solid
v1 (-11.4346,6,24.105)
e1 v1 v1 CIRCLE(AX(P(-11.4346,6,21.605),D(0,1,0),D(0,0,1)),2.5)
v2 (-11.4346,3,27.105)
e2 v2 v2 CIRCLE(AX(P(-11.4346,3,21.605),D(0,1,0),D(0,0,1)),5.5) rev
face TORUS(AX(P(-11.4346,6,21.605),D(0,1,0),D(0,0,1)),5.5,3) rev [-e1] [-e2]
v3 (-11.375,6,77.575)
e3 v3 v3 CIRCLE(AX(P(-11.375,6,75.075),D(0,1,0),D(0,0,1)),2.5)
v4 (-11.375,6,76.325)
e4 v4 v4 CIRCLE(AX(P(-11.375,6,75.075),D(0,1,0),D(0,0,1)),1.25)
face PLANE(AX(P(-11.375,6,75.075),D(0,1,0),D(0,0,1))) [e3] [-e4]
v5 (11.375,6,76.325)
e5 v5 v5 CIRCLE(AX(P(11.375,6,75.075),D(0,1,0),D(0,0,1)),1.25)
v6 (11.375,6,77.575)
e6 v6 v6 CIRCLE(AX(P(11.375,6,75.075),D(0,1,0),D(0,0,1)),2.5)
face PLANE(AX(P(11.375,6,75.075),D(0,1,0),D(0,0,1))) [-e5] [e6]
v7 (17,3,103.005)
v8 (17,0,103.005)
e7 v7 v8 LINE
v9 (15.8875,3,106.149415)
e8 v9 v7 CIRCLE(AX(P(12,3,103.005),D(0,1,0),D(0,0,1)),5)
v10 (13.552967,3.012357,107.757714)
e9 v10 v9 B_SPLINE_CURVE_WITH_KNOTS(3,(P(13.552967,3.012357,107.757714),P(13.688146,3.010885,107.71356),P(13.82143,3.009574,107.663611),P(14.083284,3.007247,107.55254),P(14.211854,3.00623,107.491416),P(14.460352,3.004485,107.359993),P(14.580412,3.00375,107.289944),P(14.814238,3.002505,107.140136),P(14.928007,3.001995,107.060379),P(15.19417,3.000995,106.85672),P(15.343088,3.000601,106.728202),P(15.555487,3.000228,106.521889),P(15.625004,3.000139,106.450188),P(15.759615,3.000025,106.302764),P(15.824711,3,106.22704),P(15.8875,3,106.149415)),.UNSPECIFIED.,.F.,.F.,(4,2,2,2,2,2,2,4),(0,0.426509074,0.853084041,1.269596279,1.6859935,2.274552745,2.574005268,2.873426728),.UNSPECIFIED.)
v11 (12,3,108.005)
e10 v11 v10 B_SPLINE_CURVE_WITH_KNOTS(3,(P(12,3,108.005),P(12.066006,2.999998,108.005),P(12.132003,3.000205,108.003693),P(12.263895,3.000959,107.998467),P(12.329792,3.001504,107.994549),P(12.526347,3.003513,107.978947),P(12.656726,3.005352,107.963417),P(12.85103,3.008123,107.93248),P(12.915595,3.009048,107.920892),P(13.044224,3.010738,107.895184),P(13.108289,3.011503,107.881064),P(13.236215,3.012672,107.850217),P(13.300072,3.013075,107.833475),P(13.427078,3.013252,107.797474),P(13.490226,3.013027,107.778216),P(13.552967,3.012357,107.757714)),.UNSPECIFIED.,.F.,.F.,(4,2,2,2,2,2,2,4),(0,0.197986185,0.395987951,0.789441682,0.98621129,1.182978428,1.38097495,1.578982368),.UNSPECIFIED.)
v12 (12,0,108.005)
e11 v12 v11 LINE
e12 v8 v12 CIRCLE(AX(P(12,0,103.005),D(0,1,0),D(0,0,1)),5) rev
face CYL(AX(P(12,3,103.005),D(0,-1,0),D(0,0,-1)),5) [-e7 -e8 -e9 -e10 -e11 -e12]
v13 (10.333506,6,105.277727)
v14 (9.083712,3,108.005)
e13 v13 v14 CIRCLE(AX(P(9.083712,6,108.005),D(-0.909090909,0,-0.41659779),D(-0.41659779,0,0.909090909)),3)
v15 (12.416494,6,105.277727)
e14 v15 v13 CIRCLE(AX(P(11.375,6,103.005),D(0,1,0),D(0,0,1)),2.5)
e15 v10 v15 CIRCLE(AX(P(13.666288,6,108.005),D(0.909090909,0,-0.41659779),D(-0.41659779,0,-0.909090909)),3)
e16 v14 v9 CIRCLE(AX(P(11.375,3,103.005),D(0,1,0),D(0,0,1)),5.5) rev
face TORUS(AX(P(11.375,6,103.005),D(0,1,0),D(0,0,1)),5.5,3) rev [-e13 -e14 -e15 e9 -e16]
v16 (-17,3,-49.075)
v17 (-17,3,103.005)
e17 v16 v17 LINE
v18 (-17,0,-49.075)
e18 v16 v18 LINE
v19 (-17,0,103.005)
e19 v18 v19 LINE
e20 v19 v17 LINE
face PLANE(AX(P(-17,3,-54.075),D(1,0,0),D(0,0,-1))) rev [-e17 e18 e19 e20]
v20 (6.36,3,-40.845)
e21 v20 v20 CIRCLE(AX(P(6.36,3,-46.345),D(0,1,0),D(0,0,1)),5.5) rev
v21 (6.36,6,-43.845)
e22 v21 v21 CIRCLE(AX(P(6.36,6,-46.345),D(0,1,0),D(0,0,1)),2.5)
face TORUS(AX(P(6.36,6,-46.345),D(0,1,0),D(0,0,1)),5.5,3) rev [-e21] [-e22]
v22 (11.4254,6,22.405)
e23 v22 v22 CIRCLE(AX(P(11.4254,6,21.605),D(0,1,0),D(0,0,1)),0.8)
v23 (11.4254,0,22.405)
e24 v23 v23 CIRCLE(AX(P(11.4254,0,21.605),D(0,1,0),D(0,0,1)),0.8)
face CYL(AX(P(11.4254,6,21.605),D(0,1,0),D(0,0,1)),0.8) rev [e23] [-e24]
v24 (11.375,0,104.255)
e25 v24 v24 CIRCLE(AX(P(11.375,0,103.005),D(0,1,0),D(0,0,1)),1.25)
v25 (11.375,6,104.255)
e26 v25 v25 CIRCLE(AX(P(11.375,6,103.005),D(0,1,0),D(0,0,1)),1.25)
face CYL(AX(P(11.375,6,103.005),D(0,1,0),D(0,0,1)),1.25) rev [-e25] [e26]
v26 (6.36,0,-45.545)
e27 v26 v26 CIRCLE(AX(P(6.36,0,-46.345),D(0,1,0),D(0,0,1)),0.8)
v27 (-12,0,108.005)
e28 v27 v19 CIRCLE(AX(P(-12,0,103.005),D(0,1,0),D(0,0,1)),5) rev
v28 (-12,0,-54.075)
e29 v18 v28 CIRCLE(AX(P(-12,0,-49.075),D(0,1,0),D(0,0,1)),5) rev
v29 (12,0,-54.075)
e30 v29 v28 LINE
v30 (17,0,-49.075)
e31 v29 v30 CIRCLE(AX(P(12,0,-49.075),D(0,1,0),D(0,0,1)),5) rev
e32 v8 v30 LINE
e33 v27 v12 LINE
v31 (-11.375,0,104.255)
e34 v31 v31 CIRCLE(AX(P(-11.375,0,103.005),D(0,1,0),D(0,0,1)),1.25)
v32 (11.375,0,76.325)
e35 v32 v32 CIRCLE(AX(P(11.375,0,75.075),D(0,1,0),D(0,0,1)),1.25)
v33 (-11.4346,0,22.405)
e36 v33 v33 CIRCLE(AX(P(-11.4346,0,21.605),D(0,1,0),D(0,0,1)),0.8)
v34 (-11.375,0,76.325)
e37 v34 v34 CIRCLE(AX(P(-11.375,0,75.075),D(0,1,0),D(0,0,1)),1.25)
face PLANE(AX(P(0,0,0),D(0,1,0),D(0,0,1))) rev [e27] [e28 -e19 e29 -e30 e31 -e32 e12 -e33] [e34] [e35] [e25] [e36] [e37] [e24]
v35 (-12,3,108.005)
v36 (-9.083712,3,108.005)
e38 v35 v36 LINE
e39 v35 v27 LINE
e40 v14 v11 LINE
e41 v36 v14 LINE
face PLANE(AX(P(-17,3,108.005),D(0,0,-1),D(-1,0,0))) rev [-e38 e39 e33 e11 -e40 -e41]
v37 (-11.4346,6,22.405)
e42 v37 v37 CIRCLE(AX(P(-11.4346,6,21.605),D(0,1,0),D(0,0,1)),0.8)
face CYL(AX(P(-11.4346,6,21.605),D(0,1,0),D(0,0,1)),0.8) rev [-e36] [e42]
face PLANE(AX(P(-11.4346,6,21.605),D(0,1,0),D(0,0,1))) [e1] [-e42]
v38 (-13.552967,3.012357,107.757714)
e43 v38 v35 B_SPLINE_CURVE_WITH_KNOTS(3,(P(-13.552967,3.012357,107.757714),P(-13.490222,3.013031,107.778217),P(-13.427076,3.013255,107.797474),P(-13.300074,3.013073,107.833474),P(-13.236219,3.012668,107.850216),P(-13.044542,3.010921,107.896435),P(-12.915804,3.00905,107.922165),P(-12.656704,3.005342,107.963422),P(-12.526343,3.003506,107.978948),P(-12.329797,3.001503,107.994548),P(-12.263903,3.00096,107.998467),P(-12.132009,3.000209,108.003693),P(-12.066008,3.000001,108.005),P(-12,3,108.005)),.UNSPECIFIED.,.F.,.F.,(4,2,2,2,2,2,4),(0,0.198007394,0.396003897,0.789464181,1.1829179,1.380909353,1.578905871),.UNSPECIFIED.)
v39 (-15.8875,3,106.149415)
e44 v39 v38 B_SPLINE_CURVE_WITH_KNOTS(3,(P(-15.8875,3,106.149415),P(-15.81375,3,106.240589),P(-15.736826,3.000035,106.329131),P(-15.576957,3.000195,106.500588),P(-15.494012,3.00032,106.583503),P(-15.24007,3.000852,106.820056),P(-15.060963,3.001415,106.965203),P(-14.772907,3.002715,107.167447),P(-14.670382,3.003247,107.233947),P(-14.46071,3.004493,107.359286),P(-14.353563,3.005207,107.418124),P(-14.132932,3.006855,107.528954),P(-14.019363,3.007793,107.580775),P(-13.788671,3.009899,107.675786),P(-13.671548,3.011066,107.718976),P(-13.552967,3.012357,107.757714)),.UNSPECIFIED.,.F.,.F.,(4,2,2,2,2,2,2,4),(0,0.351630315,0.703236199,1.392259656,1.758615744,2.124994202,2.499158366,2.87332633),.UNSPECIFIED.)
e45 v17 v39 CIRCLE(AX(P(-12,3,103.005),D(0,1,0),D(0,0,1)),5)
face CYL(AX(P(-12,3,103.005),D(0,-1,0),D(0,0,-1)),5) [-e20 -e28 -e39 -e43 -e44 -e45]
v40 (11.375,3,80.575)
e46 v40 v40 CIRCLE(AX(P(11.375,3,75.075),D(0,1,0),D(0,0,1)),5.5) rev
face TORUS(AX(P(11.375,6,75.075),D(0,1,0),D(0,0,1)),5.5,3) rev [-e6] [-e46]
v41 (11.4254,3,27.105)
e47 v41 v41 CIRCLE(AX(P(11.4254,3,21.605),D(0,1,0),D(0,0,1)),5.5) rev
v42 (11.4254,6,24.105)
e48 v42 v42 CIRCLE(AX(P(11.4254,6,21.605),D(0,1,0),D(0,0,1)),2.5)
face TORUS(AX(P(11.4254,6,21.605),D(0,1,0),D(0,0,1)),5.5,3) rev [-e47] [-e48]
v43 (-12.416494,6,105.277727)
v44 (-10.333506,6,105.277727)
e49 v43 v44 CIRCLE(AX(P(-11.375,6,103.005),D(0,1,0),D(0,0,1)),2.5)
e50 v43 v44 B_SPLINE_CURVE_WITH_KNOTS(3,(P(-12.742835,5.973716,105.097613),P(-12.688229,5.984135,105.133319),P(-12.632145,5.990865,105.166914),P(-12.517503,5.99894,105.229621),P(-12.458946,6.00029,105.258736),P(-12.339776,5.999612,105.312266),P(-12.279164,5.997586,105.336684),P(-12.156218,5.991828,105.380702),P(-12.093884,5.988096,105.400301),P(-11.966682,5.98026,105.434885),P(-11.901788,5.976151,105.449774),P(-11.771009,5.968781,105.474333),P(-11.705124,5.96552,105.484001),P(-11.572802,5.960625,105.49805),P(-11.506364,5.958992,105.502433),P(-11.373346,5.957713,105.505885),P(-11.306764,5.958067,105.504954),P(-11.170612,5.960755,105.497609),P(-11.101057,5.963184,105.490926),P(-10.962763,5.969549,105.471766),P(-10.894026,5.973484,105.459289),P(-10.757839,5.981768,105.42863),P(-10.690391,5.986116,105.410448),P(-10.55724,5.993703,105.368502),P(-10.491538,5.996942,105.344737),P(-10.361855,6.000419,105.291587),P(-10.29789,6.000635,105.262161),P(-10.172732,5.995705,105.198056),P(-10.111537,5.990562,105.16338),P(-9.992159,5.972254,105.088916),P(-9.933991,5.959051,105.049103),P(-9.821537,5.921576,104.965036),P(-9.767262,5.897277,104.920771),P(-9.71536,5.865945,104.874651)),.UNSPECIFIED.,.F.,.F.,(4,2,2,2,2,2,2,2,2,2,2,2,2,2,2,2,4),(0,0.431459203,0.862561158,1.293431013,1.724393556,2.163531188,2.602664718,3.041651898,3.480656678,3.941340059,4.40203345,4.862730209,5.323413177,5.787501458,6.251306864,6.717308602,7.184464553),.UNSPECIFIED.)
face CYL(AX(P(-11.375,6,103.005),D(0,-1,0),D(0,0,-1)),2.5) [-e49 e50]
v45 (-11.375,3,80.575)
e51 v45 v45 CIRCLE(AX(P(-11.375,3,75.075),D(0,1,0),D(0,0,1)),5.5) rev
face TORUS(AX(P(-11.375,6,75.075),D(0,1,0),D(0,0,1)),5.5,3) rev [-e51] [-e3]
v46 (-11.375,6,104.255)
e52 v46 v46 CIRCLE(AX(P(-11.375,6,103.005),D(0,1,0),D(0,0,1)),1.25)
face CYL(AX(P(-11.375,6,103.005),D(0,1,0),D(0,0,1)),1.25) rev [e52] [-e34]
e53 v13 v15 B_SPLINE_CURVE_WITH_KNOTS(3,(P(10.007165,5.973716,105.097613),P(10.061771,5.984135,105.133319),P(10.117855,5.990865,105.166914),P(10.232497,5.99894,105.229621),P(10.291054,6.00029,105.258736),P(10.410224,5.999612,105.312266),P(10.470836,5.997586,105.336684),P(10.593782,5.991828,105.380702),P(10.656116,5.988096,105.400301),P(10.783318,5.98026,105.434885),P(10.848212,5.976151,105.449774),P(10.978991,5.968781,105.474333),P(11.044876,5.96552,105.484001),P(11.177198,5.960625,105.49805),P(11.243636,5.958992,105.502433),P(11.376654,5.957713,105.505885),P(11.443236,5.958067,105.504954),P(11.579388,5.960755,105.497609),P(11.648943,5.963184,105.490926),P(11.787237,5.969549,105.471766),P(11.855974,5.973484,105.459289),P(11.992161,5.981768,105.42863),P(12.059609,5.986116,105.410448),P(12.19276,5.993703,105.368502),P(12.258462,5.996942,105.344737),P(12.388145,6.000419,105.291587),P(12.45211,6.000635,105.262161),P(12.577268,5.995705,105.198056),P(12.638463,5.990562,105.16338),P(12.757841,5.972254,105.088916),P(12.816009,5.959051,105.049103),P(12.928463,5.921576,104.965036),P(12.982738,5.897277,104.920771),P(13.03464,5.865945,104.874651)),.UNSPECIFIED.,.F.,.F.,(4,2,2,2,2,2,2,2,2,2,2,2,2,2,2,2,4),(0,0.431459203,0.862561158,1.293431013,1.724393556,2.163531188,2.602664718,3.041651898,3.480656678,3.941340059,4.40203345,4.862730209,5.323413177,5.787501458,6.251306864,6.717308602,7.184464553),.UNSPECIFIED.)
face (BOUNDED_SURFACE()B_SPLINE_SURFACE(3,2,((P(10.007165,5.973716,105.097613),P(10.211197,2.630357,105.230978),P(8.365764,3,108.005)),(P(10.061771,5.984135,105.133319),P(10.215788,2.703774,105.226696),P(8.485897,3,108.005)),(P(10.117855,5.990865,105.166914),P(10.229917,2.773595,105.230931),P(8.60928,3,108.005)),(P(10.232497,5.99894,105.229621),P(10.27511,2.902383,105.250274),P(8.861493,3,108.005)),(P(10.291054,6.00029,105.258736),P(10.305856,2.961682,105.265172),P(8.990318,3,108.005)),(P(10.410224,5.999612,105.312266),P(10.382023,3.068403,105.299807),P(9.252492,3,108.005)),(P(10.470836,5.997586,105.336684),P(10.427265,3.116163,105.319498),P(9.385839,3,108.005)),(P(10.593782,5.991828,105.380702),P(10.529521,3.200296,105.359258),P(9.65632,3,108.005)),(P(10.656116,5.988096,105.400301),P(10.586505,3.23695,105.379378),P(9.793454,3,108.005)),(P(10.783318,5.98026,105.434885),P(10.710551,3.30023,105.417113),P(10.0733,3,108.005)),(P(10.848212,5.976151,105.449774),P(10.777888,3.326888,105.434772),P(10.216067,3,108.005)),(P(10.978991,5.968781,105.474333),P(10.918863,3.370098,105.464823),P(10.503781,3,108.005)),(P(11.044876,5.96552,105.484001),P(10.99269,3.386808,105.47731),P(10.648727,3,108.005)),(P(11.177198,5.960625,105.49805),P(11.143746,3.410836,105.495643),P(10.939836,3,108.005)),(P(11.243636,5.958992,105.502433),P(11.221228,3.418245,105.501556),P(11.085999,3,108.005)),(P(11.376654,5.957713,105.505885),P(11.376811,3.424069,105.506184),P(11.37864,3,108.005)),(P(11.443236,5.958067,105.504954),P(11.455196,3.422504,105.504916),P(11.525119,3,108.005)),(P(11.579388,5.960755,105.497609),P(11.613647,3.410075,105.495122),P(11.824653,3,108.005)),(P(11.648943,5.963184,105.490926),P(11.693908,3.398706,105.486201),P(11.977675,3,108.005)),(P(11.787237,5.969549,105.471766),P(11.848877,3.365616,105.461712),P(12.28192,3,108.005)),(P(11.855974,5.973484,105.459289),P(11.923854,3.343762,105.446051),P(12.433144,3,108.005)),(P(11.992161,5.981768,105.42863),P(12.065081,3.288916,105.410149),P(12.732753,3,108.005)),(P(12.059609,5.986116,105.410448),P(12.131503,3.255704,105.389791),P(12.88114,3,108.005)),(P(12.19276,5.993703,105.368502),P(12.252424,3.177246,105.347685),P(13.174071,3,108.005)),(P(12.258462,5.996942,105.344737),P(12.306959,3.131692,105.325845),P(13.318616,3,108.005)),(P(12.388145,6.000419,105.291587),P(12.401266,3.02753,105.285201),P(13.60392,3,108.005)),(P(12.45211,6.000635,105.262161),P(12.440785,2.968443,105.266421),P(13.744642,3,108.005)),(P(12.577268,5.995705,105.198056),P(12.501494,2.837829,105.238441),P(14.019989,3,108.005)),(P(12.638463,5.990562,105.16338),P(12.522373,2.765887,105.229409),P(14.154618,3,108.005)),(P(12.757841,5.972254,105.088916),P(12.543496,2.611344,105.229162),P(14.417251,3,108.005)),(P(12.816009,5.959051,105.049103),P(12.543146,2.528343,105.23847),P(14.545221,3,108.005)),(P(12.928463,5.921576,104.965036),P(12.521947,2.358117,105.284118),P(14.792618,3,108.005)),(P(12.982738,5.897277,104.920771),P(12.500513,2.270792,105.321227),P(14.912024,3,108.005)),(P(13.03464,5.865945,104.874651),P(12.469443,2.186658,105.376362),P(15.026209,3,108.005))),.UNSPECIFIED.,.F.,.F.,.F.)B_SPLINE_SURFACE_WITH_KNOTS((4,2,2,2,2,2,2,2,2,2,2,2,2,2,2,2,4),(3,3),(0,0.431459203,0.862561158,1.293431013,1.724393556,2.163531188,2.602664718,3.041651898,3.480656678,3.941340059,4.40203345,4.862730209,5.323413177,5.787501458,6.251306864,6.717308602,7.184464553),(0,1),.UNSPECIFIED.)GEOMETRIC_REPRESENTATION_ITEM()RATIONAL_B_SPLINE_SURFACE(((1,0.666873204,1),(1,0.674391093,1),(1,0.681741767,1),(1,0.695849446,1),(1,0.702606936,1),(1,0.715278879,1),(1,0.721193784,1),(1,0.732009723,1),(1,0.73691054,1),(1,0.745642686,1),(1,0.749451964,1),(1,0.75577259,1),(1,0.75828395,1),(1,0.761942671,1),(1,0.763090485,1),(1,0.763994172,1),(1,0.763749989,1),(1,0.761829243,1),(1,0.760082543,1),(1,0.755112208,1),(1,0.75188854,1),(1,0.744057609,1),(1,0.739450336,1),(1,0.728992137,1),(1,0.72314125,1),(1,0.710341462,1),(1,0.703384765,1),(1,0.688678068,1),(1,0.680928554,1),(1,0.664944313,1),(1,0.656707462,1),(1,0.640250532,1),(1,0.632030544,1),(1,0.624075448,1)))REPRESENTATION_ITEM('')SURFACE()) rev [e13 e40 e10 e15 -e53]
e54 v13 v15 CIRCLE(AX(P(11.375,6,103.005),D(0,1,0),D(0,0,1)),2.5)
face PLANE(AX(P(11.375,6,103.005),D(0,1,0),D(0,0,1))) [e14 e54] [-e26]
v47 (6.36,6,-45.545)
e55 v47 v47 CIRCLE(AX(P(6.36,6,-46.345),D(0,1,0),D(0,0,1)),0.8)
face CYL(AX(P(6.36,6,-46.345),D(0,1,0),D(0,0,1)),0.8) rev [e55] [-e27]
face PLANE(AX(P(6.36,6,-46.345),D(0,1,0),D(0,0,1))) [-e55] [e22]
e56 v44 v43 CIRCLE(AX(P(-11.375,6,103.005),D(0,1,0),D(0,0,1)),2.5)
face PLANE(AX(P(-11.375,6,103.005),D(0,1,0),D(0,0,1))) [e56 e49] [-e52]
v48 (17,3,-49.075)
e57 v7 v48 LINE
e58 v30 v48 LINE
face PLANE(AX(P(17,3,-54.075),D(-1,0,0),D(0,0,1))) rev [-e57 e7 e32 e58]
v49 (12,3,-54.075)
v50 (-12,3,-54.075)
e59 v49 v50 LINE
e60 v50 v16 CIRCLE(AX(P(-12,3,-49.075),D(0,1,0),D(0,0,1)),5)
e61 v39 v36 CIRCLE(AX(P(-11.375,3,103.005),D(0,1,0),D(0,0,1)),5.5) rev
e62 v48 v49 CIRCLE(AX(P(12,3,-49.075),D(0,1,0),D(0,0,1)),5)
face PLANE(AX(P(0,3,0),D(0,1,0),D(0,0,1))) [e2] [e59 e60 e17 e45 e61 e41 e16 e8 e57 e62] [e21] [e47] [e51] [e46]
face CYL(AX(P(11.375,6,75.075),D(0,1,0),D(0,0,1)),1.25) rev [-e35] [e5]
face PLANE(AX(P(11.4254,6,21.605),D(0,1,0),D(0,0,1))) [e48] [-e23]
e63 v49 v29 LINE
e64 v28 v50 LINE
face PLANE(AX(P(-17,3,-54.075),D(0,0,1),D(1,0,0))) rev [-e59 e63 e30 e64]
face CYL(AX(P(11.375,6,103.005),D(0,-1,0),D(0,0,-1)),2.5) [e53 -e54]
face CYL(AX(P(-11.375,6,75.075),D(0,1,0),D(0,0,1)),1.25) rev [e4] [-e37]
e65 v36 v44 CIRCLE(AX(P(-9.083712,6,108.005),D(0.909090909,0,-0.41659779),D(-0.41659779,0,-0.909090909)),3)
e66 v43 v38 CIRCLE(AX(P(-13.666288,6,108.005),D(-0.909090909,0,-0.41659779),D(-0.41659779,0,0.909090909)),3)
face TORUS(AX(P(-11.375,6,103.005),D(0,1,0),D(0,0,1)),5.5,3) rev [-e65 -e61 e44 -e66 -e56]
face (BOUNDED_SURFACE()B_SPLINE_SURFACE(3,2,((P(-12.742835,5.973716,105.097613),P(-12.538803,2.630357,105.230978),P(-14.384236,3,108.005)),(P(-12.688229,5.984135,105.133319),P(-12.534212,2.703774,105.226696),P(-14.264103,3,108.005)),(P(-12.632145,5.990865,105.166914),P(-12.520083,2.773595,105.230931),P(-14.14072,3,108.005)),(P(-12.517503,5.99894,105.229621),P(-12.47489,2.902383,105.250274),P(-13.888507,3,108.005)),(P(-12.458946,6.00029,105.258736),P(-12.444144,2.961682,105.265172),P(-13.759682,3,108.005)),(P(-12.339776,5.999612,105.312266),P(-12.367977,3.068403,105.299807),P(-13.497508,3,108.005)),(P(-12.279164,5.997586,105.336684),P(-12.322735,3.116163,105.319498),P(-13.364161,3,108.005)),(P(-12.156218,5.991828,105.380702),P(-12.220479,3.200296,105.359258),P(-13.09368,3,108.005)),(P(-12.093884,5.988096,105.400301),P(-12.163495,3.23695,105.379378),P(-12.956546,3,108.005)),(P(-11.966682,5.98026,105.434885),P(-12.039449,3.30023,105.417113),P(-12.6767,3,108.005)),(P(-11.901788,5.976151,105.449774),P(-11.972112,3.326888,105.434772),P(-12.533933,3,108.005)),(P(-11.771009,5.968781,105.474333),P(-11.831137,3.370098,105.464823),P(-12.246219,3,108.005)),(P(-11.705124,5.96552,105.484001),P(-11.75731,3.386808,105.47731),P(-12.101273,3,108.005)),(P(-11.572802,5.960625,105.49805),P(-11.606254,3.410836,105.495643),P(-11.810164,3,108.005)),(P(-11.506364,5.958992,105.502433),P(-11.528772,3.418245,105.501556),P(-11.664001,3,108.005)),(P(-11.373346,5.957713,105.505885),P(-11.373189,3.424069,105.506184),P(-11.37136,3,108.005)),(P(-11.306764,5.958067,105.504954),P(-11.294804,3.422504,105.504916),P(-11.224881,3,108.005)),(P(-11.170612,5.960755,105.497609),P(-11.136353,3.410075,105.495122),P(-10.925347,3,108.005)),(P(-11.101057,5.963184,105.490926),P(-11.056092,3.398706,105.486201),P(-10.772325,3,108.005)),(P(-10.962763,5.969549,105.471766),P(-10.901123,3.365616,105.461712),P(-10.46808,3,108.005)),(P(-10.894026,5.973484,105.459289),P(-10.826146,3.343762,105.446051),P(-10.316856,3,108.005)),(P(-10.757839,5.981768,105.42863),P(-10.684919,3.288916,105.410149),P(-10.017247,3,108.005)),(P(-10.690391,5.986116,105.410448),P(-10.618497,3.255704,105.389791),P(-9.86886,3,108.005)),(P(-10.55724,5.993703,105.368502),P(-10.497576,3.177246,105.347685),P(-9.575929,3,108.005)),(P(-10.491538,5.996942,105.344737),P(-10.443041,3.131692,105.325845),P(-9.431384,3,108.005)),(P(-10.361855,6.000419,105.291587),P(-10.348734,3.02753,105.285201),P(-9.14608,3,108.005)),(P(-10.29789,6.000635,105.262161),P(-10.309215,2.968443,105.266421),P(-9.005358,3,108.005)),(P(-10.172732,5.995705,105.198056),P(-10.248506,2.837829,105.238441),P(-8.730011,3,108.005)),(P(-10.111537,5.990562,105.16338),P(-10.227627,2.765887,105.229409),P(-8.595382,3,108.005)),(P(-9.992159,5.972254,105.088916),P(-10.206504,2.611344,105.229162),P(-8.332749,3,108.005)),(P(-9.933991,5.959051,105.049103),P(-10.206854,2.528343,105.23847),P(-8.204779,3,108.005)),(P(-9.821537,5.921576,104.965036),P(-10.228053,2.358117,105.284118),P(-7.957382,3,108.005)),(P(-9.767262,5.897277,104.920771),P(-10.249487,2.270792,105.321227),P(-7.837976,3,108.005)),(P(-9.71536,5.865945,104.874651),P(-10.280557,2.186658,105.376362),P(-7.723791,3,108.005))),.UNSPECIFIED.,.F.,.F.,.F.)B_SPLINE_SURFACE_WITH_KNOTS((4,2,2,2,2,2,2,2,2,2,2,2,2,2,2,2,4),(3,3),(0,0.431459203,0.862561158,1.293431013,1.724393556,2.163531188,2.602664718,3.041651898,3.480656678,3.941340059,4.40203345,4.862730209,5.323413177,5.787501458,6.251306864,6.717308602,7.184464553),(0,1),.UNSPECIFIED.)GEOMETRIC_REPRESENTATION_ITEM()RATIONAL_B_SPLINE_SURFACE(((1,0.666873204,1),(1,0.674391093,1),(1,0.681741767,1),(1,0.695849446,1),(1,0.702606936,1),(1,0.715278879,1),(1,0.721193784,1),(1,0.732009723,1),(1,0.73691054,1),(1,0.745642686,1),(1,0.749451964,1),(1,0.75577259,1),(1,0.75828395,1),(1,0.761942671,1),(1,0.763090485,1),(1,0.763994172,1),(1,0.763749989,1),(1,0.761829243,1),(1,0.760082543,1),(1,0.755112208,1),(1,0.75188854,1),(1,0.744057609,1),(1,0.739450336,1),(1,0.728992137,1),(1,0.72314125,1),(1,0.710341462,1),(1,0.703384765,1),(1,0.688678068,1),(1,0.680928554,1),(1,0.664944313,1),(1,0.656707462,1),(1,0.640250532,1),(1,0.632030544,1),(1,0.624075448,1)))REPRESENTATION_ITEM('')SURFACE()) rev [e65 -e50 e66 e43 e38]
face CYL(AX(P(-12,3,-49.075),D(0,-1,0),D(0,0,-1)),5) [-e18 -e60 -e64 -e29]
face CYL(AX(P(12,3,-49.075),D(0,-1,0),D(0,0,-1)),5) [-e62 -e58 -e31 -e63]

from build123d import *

# Parameters (mm, degrees)
SKETCH3_W                   = 34
SKETCH3_H                   = 162.08
BOSS_EXTRUDE1_DEPTH         = 3
SKETCH4_R                   = 2.5
BOSS_EXTRUDE2_DEPTH         = 3
FILLET1_R                   = 3
TAP_DRILL_FOR_M2X0_4_TAP1_D = 1.6
TAP_DRILL_FOR_M3X0_5_TAP1_D = 2.5
FILLET2_R                   = 5


# Some blends are built 0.0001 mm under size
with BuildPart() as part:
    # Sketch3 → Boss-Extrude1 (new body)
    with BuildSketch(Plane(origin=(0, 0, 0), x_dir=(1, 0, 0), z_dir=(0, 1, 0))):
        with Locations((0, -26.965)):
            Rectangle(SKETCH3_W, SKETCH3_H)
    extrude(amount=BOSS_EXTRUDE1_DEPTH)

    # Sketch4 → Boss-Extrude2 (add)
    with BuildSketch(Plane(origin=(0, 3, 0), x_dir=(1, 0, 0), z_dir=(0, 1, 0))):
        with Locations(Location((6.36, 46.345, 0), (0, 0, 270))):
            Circle(SKETCH4_R)
        with Locations(Location((-11.4346, -21.605, 0), (0, 0, 270))):
            Circle(SKETCH4_R)
        with Locations(Location((11.4254, -21.605, 0), (0, 0, 270))):
            Circle(SKETCH4_R)
        with Locations(Location((-11.375, -75.075, 0), (0, 0, 270))):
            Circle(SKETCH4_R)
        with Locations(Location((-11.375, -103.005, 0), (0, 0, 270))):
            Circle(SKETCH4_R)
        with Locations(Location((11.375, -103.005, 0), (0, 0, 270))):
            Circle(SKETCH4_R)
        with Locations(Location((11.375, -75.075, 0), (0, 0, 270))):
            Circle(SKETCH4_R)
    extrude(amount=BOSS_EXTRUDE2_DEPTH)

    # Fillet1
    fillet1_edges = [part.edges().sort_by_distance(p)[0] for p in [
        (6.36, 3, -48.845),
        (-11.4346, 3, 19.105),
        (11.4254, 3, 19.105),
        (-11.375, 3, 72.575),
        (-11.375, 3, 100.505),
        (11.375, 3, 100.505),
        (11.375, 3, 72.575),
    ]]
    fillet(fillet1_edges, radius=FILLET1_R - 0.0001)  # a hair under: the kernel refuses the full size

    # Tap Drill for M2x0.4 Tap1 (through all)
    with Locations(Plane(origin=(0, 6, 0), x_dir=(1, 0, 0), z_dir=(0, 1, 0))):
        with Locations((6.36, 46.345), (-11.4346, -21.605), (11.4254, -21.605)):
            Hole(TAP_DRILL_FOR_M2X0_4_TAP1_D / 2)

    # Tap Drill for M3x0.5 Tap1 (through all)
    with Locations(Plane(origin=(0, 6, 0), x_dir=(1, 0, 0), z_dir=(0, 1, 0))):
        with Locations((-11.375, -75.075), (-11.375, -103.005), (11.375, -103.005), (11.375, -75.075)):
            Hole(TAP_DRILL_FOR_M3X0_5_TAP1_D / 2)

    # Fillet2
    # the kernel refuses this fillet: 5 mm, written as the material it takes off along each edge
    with BuildSketch(Plane(origin=(-17, -12.5, -54.075), x_dir=(1, 0, 0), z_dir=(0, 1, 0)), Plane(origin=(17, -12.5, -54.075), x_dir=(0, 0, 1), z_dir=(0, 1, 0)), Plane(origin=(17, -12.5, 108.005), x_dir=(-1, 0, 0), z_dir=(0, 1, 0))) as fillet2_piece_1:
        with BuildLine():
            CenterArc((FILLET2_R, -FILLET2_R), FILLET2_R, 90, 90)
            Line((0, -FILLET2_R), (0, 0))
            Line((0, 0), (FILLET2_R, 0))
        make_face()
    extrude(amount=28, mode=Mode.SUBTRACT)
    with BuildSketch(Plane(origin=(-17, -12.5, 108.005), x_dir=(1, 0, 0), z_dir=(0, 1, 0))) as fillet2_piece_2:
        with BuildLine():
            CenterArc((FILLET2_R, FILLET2_R), FILLET2_R, 180, 90)
            Line((0, FILLET2_R), (0, 0))
            Line((0, 0), (FILLET2_R, 0))
        make_face()
    extrude(amount=28, mode=Mode.SUBTRACT)


solid = part.part
